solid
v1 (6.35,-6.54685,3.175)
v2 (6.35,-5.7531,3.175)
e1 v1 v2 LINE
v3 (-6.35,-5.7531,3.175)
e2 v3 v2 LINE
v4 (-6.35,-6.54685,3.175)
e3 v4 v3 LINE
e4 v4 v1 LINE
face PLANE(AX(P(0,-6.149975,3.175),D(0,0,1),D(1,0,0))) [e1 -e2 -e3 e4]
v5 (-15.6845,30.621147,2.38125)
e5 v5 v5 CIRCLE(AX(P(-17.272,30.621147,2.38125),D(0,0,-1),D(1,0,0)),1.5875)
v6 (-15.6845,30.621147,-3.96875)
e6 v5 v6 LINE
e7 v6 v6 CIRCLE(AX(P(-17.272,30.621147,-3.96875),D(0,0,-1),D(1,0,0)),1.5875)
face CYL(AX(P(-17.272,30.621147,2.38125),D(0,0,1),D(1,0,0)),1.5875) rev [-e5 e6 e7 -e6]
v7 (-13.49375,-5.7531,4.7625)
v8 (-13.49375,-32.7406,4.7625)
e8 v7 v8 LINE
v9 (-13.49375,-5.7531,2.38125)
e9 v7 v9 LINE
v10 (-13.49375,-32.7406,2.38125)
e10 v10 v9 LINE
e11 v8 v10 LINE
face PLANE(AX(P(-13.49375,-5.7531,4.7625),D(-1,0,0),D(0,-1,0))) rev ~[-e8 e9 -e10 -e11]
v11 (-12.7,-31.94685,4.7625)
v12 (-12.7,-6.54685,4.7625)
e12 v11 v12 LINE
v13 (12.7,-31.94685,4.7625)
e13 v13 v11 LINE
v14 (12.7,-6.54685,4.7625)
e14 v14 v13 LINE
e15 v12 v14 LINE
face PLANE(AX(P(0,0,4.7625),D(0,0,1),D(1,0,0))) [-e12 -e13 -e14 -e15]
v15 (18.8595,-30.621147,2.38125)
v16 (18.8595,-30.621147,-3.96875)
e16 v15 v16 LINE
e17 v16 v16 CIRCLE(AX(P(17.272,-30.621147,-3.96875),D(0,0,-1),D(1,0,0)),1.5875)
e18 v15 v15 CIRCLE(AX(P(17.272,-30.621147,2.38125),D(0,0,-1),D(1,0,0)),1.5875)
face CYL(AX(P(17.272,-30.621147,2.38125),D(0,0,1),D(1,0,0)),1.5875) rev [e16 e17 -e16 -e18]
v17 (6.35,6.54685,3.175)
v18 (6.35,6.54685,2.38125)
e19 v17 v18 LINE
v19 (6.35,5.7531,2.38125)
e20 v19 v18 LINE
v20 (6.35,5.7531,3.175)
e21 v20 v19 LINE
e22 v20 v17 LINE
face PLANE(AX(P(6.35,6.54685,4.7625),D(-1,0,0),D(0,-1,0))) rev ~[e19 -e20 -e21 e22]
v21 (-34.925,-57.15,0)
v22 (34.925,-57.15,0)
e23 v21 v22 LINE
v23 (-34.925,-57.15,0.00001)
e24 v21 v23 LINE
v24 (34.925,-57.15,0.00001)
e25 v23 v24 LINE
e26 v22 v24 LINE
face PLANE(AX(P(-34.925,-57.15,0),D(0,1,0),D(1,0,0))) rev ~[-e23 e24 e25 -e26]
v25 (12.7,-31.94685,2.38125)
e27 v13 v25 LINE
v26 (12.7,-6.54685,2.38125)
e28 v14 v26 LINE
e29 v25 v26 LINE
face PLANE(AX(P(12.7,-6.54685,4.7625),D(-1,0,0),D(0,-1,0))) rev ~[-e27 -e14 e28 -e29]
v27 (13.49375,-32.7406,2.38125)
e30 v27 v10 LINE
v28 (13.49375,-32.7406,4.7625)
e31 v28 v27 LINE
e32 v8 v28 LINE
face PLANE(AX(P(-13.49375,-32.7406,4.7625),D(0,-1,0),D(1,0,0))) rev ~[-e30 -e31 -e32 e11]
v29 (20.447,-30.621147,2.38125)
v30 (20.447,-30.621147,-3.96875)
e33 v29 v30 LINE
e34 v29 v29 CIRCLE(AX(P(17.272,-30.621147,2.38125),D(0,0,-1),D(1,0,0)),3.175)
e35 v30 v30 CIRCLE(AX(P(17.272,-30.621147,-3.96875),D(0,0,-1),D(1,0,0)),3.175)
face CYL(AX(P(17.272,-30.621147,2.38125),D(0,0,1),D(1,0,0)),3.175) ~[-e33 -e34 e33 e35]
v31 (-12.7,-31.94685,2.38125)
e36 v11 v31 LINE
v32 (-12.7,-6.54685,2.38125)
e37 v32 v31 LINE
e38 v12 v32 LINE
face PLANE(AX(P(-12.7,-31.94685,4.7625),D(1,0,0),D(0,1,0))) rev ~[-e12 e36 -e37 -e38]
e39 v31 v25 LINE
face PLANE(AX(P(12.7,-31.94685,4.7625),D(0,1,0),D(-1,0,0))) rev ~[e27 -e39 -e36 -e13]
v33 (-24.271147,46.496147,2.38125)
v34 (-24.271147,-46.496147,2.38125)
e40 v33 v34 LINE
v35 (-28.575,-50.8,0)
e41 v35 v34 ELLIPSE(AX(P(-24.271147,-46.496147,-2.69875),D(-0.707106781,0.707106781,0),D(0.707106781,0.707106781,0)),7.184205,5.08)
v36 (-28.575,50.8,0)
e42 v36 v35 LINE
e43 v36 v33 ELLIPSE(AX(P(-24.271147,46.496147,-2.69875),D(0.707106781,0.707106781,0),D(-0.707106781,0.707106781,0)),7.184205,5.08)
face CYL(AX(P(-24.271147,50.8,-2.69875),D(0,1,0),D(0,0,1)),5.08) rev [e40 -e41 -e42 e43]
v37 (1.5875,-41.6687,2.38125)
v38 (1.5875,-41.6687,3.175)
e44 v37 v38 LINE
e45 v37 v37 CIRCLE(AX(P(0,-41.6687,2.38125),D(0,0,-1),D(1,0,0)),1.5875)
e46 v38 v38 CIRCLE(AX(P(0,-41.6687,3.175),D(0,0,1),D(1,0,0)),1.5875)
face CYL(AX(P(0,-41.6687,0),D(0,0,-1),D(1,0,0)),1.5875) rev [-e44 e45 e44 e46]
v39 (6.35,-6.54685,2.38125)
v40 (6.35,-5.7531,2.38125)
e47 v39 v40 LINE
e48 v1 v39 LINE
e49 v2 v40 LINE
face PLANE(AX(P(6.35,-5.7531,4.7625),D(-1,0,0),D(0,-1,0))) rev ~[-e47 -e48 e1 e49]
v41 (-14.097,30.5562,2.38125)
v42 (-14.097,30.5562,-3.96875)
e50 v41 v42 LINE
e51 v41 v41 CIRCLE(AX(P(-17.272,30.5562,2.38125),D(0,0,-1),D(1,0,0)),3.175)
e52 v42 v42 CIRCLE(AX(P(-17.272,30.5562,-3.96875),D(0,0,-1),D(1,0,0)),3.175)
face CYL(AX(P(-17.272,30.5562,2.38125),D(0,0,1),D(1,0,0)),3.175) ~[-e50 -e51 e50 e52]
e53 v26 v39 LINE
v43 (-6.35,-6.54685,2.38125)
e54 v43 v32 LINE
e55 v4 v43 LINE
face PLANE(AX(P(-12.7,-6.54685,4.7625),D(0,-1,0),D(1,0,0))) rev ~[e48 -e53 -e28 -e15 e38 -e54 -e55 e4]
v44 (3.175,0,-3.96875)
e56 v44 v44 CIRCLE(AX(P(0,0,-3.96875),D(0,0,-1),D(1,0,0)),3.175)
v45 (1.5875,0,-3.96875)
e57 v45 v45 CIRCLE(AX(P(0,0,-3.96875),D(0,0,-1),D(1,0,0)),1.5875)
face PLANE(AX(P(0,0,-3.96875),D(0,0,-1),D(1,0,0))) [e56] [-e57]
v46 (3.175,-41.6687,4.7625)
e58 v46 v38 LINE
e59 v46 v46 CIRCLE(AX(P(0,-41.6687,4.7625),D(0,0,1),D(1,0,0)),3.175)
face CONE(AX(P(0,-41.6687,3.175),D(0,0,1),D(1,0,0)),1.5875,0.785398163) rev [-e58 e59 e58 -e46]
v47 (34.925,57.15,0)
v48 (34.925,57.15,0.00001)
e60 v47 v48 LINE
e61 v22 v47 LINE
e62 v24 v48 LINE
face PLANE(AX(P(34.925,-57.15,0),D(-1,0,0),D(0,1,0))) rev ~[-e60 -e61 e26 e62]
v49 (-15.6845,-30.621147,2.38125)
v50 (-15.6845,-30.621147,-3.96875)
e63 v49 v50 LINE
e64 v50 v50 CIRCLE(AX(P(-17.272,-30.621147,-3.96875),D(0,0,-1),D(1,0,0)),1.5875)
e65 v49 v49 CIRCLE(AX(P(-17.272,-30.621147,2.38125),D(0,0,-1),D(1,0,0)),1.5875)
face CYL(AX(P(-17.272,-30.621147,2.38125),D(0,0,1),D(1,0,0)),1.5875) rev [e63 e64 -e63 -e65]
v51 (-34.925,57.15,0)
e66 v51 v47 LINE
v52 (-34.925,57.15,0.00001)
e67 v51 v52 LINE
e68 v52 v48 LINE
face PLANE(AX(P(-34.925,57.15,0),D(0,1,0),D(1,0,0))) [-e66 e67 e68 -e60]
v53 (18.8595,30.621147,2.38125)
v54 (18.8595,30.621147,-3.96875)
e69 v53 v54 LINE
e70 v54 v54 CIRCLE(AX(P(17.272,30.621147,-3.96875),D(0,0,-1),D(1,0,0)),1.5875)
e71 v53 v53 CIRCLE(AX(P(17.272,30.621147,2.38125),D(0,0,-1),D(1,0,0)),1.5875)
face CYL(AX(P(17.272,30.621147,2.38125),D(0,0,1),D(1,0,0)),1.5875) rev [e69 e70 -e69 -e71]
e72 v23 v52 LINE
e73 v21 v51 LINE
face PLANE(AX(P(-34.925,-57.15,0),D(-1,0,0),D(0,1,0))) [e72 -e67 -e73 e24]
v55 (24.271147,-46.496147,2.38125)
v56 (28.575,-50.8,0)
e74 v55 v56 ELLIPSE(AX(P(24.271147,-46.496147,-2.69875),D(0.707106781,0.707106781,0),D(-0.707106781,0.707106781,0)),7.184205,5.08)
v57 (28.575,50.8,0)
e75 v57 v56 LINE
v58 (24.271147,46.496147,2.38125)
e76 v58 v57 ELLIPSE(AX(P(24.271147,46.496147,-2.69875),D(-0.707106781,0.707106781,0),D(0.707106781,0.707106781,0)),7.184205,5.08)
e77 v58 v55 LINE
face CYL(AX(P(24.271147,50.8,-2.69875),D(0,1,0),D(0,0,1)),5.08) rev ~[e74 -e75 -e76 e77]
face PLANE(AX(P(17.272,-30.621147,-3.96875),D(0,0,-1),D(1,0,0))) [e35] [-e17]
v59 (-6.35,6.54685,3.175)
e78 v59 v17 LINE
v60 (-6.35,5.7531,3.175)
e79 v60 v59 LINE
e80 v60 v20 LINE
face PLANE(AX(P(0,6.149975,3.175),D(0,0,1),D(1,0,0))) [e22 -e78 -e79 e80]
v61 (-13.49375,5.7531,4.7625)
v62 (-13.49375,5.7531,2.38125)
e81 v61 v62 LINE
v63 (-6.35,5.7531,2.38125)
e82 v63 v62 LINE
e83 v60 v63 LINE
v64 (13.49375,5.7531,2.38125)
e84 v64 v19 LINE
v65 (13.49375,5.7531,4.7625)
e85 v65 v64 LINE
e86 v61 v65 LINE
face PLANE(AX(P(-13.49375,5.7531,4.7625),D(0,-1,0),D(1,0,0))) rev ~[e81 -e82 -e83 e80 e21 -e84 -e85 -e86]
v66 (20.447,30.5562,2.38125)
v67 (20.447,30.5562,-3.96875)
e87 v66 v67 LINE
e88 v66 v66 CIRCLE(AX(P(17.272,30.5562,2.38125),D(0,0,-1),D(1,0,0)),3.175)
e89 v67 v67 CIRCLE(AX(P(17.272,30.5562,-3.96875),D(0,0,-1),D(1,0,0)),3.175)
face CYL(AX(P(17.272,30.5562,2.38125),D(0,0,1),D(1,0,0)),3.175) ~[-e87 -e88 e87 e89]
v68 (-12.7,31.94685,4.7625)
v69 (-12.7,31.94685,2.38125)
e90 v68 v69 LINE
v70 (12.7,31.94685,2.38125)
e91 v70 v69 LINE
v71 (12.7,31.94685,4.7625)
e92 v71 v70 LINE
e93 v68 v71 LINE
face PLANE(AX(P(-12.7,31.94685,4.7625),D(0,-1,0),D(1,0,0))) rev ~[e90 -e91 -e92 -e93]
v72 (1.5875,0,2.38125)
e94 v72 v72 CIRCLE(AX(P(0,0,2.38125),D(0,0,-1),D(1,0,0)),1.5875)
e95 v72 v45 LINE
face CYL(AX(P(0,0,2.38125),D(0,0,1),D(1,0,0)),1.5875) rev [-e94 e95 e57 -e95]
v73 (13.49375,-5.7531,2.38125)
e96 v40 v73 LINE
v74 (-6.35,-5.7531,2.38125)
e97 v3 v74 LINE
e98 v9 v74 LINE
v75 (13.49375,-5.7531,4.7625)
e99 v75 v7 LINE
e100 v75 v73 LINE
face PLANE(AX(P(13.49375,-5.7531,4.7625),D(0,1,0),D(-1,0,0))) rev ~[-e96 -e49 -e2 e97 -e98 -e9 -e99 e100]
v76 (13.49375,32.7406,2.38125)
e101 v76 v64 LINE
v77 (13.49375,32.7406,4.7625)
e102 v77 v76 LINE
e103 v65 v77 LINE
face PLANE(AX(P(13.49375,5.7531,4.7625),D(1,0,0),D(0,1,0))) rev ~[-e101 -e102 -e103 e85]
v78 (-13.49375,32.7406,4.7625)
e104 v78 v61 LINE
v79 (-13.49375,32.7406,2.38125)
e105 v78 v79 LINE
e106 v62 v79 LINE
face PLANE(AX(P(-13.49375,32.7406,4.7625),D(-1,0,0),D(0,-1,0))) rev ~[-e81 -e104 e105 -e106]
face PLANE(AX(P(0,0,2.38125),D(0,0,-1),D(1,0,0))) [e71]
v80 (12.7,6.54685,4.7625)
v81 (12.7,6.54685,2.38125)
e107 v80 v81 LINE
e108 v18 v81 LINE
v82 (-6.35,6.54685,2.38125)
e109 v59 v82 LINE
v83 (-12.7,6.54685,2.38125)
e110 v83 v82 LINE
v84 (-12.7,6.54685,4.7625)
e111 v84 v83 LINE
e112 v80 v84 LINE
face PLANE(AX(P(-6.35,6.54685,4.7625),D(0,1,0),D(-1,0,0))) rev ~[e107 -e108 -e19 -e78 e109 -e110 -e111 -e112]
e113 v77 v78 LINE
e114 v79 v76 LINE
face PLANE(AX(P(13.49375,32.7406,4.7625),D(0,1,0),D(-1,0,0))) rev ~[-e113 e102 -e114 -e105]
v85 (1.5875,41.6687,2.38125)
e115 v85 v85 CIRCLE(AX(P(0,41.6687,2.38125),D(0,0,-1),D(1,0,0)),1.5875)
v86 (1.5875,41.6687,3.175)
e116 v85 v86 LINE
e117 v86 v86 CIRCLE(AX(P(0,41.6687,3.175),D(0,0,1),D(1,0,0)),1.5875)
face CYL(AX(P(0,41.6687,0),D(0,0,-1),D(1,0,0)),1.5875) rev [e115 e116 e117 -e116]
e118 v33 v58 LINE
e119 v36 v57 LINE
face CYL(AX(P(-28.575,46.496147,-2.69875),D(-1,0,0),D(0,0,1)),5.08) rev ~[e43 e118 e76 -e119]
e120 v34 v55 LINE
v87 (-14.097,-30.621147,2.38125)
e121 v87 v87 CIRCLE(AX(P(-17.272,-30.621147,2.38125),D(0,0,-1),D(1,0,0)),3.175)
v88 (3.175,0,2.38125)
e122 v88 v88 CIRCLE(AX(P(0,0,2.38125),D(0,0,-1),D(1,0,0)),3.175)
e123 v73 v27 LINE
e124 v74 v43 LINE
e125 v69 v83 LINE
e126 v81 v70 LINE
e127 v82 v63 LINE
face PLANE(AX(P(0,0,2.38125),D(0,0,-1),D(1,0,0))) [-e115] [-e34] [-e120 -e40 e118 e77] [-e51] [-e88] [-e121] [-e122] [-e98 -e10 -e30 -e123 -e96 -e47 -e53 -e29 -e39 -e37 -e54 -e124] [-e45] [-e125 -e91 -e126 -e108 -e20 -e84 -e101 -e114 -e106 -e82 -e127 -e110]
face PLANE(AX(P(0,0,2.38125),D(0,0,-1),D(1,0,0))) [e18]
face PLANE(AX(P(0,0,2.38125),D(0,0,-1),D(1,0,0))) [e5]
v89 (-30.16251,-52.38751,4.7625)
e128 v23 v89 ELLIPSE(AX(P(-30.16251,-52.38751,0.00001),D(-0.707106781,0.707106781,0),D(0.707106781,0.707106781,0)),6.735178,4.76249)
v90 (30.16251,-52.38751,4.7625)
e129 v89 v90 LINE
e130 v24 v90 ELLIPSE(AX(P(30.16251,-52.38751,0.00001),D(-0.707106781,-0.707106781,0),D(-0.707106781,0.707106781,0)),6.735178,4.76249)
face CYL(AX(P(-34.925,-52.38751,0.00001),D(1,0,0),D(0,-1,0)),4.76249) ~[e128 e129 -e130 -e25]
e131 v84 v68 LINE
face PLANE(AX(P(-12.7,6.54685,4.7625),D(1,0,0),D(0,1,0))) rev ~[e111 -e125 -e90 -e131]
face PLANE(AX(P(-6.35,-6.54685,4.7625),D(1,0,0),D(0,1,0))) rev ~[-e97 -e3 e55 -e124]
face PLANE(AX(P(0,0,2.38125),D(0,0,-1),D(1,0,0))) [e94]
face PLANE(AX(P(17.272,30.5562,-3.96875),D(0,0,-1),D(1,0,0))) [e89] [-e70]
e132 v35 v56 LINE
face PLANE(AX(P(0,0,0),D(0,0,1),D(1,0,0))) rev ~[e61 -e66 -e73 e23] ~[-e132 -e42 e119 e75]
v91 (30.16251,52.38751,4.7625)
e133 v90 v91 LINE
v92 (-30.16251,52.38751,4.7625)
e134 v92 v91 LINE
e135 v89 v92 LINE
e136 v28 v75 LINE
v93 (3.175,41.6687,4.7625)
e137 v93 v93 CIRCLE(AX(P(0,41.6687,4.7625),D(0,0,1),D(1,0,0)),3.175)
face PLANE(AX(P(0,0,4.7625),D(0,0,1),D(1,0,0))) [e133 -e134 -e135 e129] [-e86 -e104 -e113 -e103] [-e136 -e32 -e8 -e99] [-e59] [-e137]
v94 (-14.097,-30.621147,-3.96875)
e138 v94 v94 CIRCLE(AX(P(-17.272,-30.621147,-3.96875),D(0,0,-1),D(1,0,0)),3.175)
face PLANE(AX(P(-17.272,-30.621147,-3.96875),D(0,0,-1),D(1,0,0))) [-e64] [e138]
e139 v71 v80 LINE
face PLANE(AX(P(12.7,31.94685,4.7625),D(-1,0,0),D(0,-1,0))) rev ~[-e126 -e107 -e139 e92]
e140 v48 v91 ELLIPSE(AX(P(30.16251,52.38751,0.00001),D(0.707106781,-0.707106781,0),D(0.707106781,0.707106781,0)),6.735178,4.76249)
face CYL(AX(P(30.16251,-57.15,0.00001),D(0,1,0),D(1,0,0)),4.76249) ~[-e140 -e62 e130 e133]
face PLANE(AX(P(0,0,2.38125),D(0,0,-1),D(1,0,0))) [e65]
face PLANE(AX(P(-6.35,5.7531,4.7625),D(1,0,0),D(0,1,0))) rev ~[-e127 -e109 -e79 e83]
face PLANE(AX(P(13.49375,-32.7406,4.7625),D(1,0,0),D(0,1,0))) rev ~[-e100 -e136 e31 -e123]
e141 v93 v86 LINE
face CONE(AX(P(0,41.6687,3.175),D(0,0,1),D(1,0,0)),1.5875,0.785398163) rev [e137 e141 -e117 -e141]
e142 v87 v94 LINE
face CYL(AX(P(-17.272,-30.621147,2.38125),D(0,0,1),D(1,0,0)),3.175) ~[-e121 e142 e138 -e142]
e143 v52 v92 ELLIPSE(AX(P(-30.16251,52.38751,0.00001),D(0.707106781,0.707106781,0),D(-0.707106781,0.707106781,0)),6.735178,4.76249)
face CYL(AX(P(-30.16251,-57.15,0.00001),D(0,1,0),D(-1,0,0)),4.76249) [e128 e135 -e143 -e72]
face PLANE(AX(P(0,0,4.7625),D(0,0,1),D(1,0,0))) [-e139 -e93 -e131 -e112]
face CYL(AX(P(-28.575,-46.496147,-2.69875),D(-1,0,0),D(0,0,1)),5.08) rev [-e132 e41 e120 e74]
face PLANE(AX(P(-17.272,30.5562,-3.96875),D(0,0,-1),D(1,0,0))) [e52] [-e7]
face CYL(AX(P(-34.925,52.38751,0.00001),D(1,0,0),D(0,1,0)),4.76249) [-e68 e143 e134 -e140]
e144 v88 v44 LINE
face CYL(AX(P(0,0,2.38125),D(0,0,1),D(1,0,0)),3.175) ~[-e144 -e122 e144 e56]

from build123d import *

# Parameters (mm, degrees)
F0_W        = 69.85
F0_H        = 114.3
F0_R        = 1.5875
F1_DEPTH    = 4.7625
F2_R        = 4.76249
F3_SIZE     = 1.5875
F4_W        = 57.15
F4_H        = 101.6
F5_DEPTH    = 2.38125
F6_T1_DEPTH = 101.6
F6_T3_DEPTH = 57.15
F8_DEPTH    = 4.7635
F7_W        = 12.7
F7_H        = 0.79375
F9_DEPTH    = 1.5875
F10_R       = 3.175
F10_R_2     = 1.5875
F11_DEPTH   = 6.35


# Not quite as in the source:
# - a fillet or chamfer that OpenCascade refuses, or shapes differently, is made with other operations: its cross-section is extruded or revolved along the edge and cut away or added
# - a fillet or chamfer is up to 0.001 mm smaller than in the source, because OpenCascade refuses the exact size


with BuildPart() as f1:
    # F0 (on Top) → F1 (new body)
    with BuildSketch(Plane.XY):
        Rectangle(F0_W, F0_H)
        with Locations((0, -41.6687)):
            Circle(F0_R, mode=Mode.SUBTRACT)
        with Locations((0, 41.6687)):
            Circle(F0_R, mode=Mode.SUBTRACT)
    extrude(amount=F1_DEPTH)

    # F2 (radius 4.7625 in the source; OpenCascade refuses exactly that, so slightly less here)
    f2_edges = [f1.edges().sort_by_distance(p)[0] for p in [
        (34.925, 0, 4.7625),
        (0, -57.15, 4.7625),
        (-34.925, 0, 4.7625),
        (0, 57.15, 4.7625),
    ]]
    fillet(f2_edges, radius=F2_R)

    # F3
    f3_edges = [f1.edges().sort_by_distance(p)[0] for p in [
        (-1.5875, 41.6687, 4.7625),
        (-1.5875, -41.6687, 4.7625),
    ]]
    chamfer(f3_edges, length=F3_SIZE)

    # F4 (on face) → F5 (cut)
    with BuildSketch(Plane(origin=(0, 0, 0), x_dir=(1, 0, 0), z_dir=(0, 0, -1))):
        Rectangle(F4_W, F4_H)
    extrude(amount=-F5_DEPTH, mode=Mode.SUBTRACT)

    # F6: fillet of radius 5.08 on 4 edges, made by hand

    # F6_s2 → F6_t1 (join)
    with BuildSketch(Plane.XZ.offset(-50.8)):
        with BuildLine():
            ThreePointArc((24.2711472565, 2.38125), (26.7304916814, 1.74625), (28.575, 0))
            Line((28.575, 0), (28.575, 2.38125))
            Line((28.575, 2.38125), (24.2711472565, 2.38125))
        make_face()
        with BuildLine():
            ThreePointArc((-24.2711472565, 2.38125), (-26.7304916814, 1.74625), (-28.575, 0))
            Line((-28.575, 0), (-28.575, 2.38125))
            Line((-28.575, 2.38125), (-24.2711472565, 2.38125))
        make_face()
    extrude(amount=F6_T1_DEPTH)

    # F6_s4 → F6_t3 (join)
    with BuildSketch(Plane.YZ.offset(-28.575)):
        with BuildLine():
            ThreePointArc((-46.4961472565, 2.38125), (-48.9554916814, 1.74625), (-50.8, 0))
            Line((-50.8, 0), (-50.8, 2.38125))
            Line((-50.8, 2.38125), (-46.4961472565, 2.38125))
        make_face()
        with BuildLine():
            ThreePointArc((46.4961472565, 2.38125), (48.9554916814, 1.74625), (50.8, 0))
            Line((50.8, 0), (50.8, 2.38125))
            Line((50.8, 2.38125), (46.4961472565, 2.38125))
        make_face()
    extrude(amount=F6_T3_DEPTH)

    # F7 (on face) → F8 (cut, through all)
    with BuildSketch(Plane.XY.offset(4.7625)):
        Polygon((-12.7, 31.94685), (12.7, 31.94685), (12.7, 6.54685), (6.35, 6.54685), (6.35, 5.7531), (13.49375, 5.7531), (13.49375, 32.7406), (-13.49375, 32.7406), (-13.49375, 5.7531), (-6.35, 5.7531), (-6.35, 6.54685), (-12.7, 6.54685), align=None)
        Polygon((6.35, -5.7531), (6.35, -6.54685), (12.7, -6.54685), (12.7, -31.94685), (-12.7, -31.94685), (-12.7, -6.54685), (-6.35, -6.54685), (-6.35, -5.7531), (-13.49375, -5.7531), (-13.49375, -32.7406), (13.49375, -32.7406), (13.49375, -5.7531), align=None)
    extrude(amount=-F8_DEPTH, mode=Mode.SUBTRACT)

    # F7 (on face) → F9 (cut)
    with BuildSketch(Plane.XY.offset(4.7625)):
        with Locations((0, 6.149975)):
            Rectangle(F7_W, F7_H)
        with Locations((0, -6.149975)):
            Rectangle(F7_W, F7_H)
    extrude(amount=-F9_DEPTH, mode=Mode.SUBTRACT)

    # F10 (on face) → F11 (join)
    with BuildSketch(Plane(origin=(0, 0, 2.38125), x_dir=(1, 0, 0), z_dir=(0, 0, -1))):
        with Locations((-17.272, 30.6211472565)):
            Circle(F10_R)
        with Locations((-17.272, 30.6211472565)):
            Circle(F10_R_2, mode=Mode.SUBTRACT)
        with Locations((-17.272, -30.5562)):
            Circle(F10_R)
        with Locations((-17.272, -30.6211472565)):
            Circle(F10_R_2, mode=Mode.SUBTRACT)
        with Locations((17.272, 30.6211472565)):
            Circle(F10_R)
        with Locations((17.272, 30.6211472565)):
            Circle(F10_R_2, mode=Mode.SUBTRACT)
        with Locations((17.272, -30.5562)):
            Circle(F10_R)
        with Locations((17.272, -30.6211472565)):
            Circle(F10_R_2, mode=Mode.SUBTRACT)
        Circle(F10_R)
        Circle(F10_R_2, mode=Mode.SUBTRACT)
    extrude(amount=F11_DEPTH)


solid = f1.part
